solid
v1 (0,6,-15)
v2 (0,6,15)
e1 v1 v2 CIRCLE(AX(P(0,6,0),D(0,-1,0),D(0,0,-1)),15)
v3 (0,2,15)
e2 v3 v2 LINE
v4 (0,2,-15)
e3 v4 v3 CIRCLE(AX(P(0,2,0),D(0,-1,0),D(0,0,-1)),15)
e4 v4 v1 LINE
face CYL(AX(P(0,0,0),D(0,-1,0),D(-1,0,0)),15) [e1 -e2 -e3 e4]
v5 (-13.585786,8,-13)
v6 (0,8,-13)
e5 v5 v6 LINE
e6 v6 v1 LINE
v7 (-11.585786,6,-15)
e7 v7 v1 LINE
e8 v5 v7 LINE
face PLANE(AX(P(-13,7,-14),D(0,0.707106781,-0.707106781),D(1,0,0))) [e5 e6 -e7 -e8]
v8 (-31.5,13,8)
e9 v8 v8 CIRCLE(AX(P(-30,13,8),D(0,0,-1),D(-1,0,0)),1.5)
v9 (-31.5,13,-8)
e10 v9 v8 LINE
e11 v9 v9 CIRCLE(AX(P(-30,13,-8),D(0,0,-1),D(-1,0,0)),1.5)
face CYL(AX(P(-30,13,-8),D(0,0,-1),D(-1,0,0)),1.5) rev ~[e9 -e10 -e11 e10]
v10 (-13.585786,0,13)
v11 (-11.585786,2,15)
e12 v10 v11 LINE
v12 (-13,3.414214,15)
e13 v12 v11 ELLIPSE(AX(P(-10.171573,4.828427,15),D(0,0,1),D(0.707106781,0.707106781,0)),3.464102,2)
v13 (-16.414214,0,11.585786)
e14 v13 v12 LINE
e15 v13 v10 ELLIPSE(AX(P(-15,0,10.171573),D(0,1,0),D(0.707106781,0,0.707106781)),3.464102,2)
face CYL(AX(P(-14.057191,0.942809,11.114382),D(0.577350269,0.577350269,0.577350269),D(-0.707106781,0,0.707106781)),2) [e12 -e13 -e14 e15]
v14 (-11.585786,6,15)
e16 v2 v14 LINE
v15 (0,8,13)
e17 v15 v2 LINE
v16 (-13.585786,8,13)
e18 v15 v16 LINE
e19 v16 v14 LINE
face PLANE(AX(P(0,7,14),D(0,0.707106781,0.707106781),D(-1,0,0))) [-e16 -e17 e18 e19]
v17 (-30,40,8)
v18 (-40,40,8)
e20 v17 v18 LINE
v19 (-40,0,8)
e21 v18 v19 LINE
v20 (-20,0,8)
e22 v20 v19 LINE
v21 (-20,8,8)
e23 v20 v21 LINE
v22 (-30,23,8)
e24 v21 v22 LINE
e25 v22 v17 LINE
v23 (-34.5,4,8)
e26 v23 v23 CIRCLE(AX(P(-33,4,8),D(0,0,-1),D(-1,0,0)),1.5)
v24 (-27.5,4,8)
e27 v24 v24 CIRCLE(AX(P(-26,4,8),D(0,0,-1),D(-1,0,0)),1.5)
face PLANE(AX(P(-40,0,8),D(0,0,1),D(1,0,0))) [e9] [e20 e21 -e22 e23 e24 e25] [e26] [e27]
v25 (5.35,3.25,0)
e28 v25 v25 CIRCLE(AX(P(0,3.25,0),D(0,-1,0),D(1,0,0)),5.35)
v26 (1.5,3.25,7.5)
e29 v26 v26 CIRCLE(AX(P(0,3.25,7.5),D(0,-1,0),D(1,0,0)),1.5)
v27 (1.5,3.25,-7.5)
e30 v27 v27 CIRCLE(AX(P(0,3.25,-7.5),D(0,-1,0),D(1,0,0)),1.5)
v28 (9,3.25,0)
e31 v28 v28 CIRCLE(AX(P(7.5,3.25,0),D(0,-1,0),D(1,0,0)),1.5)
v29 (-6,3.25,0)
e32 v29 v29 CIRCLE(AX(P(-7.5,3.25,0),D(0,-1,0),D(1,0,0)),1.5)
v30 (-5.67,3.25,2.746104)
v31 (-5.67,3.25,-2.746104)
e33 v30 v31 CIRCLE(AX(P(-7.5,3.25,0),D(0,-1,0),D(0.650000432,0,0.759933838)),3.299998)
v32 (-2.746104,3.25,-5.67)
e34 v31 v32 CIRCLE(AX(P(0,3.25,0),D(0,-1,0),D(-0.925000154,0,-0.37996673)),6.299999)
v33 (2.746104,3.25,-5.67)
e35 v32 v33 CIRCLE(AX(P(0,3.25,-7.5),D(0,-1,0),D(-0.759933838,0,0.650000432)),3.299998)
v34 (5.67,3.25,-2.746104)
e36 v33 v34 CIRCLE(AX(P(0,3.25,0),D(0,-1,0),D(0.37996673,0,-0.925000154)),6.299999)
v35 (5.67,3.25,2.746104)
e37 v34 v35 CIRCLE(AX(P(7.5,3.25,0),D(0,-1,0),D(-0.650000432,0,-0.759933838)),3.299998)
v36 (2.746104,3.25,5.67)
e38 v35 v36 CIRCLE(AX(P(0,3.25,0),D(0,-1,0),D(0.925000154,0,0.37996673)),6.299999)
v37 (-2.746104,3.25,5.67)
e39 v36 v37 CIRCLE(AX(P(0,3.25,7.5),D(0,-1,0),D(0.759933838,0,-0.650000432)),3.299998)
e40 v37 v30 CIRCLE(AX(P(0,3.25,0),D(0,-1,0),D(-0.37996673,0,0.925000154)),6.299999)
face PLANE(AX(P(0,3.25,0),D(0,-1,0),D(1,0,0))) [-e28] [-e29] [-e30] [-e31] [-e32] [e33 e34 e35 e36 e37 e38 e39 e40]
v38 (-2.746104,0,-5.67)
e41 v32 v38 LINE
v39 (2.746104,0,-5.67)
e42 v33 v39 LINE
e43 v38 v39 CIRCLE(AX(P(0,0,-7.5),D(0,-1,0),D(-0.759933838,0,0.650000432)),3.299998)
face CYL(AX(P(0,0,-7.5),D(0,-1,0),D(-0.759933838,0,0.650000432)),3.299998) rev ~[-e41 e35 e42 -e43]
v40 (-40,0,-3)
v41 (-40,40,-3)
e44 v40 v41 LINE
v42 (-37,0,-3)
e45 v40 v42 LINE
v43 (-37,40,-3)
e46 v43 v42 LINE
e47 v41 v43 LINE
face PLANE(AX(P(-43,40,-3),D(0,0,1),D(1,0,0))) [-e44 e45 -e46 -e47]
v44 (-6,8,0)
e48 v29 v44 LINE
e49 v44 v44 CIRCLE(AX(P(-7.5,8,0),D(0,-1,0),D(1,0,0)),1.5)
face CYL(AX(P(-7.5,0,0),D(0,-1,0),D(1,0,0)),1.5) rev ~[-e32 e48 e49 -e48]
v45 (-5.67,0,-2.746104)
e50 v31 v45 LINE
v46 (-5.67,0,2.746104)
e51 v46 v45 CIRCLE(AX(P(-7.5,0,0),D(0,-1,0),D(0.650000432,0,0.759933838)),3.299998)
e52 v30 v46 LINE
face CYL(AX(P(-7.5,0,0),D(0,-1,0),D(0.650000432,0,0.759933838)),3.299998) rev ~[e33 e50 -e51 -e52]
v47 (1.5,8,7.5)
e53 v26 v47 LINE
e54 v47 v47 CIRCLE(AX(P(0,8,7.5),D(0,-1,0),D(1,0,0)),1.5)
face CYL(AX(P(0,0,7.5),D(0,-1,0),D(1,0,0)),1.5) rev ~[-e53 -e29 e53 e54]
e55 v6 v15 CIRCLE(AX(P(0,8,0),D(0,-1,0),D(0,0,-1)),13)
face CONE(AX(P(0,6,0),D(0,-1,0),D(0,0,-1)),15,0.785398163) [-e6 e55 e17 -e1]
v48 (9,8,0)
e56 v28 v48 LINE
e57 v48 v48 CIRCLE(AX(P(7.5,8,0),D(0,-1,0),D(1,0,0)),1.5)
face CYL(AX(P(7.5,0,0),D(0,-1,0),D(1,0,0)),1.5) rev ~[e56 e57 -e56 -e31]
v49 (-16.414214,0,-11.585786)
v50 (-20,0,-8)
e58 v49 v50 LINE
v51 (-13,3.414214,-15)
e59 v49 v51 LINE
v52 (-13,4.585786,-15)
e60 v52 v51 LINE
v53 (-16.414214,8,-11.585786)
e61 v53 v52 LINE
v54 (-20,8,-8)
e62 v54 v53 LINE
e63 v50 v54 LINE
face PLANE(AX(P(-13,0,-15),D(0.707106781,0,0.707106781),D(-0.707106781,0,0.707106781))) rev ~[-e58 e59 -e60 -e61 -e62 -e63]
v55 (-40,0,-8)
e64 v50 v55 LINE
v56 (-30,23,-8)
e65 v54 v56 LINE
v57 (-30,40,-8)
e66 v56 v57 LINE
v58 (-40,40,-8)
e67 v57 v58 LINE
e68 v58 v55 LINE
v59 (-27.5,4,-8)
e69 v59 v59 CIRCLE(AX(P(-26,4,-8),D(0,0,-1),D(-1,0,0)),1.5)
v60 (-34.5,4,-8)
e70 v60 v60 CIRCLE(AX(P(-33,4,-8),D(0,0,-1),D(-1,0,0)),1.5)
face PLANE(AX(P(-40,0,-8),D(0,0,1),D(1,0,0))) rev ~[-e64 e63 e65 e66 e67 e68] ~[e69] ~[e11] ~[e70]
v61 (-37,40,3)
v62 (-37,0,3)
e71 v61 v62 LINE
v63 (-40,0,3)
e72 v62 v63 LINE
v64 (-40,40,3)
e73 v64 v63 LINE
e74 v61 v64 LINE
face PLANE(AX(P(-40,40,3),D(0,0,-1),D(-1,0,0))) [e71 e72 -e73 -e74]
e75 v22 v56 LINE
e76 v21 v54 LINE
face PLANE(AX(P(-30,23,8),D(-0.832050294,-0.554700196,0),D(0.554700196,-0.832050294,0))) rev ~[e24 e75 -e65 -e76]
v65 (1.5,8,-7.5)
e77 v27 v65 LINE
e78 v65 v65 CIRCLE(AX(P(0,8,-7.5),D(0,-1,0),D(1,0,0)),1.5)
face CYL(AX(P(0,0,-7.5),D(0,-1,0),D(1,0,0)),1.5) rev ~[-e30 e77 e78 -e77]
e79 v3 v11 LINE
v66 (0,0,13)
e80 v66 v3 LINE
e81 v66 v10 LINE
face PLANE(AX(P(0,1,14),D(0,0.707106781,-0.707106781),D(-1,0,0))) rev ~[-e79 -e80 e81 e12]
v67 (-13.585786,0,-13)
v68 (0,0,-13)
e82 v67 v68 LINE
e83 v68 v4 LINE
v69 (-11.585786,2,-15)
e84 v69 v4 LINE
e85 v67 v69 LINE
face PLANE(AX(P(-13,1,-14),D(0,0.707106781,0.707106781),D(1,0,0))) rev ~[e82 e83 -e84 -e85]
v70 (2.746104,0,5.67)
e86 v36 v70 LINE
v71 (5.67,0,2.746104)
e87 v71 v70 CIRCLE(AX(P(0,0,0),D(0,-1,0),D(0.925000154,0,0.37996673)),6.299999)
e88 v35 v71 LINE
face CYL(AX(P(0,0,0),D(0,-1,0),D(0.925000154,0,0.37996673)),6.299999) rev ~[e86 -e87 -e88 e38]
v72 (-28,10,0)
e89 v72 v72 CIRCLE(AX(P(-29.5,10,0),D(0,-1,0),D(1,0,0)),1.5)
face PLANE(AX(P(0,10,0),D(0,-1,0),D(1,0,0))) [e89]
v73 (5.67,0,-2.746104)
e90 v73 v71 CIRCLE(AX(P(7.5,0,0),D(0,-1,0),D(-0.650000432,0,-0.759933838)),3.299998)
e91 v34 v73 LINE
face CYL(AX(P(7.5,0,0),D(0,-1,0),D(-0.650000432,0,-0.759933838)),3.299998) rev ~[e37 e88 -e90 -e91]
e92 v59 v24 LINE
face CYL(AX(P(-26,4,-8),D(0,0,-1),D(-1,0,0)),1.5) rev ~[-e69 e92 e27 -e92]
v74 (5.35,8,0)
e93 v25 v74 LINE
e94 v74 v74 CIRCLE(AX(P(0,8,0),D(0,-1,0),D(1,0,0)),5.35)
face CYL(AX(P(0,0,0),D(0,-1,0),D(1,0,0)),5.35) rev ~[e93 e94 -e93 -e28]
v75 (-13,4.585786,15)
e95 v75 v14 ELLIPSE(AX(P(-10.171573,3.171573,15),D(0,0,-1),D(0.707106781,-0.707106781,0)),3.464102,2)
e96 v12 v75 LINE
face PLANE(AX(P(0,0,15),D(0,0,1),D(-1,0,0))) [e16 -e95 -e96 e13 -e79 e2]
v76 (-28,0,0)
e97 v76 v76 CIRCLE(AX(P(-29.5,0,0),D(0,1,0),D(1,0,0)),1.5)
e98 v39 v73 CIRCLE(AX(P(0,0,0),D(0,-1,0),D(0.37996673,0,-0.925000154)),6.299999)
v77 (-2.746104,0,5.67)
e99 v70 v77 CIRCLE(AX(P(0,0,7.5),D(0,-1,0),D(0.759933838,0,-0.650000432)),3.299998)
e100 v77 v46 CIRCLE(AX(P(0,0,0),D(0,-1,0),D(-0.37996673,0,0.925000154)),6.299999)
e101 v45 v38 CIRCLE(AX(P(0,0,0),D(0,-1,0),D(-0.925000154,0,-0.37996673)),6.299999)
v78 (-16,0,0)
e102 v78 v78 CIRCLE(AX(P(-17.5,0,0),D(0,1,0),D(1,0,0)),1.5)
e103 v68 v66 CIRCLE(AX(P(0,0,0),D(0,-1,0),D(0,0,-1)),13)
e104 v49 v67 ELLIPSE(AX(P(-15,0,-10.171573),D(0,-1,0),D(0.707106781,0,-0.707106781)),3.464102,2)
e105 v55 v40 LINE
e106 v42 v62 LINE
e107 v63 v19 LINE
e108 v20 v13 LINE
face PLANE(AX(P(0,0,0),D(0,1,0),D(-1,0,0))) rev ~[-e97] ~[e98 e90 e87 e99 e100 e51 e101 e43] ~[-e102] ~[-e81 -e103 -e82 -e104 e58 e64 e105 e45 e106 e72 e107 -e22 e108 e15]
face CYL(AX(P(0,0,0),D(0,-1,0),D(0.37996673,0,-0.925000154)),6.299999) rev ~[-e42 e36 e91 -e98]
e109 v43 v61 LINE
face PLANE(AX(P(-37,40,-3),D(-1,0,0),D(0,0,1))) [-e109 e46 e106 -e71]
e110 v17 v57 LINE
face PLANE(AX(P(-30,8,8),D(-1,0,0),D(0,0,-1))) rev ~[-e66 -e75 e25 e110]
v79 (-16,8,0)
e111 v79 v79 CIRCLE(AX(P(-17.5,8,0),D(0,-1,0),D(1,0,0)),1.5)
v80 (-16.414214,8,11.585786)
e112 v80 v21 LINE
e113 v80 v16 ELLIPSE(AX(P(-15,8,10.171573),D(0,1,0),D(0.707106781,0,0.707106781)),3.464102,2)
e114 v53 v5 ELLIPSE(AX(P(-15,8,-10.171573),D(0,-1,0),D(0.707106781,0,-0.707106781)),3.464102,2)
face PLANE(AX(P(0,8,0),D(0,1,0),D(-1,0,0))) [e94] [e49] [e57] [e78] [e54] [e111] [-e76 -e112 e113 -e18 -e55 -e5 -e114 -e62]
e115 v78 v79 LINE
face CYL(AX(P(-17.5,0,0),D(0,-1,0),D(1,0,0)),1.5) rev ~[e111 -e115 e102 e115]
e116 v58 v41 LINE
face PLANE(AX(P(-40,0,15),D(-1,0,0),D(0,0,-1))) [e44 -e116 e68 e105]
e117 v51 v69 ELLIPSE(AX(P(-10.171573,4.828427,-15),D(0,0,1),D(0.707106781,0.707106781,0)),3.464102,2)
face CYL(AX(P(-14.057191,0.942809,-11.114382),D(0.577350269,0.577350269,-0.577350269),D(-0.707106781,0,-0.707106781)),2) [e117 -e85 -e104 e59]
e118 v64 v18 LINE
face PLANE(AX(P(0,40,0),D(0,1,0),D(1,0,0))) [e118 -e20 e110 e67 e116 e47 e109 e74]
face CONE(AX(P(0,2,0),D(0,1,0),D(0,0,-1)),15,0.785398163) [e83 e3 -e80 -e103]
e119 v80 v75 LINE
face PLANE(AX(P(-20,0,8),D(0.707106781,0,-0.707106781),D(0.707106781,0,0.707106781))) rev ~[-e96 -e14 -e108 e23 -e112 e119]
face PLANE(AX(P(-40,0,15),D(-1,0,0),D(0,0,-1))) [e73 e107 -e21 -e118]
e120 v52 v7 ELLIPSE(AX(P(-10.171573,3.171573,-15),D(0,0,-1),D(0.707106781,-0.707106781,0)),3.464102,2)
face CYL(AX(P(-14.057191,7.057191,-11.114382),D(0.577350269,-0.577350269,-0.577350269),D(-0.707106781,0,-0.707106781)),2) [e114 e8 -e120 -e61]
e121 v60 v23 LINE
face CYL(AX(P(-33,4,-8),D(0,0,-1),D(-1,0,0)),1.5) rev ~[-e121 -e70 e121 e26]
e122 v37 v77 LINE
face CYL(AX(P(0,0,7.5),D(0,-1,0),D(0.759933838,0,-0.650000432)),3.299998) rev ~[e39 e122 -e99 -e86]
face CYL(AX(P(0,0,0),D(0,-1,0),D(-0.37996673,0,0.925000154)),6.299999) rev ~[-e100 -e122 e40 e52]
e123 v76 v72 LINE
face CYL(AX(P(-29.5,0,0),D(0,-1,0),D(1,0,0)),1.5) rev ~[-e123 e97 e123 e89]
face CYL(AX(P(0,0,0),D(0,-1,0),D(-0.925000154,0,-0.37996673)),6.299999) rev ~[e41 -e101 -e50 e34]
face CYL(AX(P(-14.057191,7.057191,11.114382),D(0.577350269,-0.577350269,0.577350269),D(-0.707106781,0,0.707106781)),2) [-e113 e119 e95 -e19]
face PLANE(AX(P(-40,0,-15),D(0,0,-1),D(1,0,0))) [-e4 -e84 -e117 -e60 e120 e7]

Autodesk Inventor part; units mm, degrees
ref_plane "YZ Plane" through (0, 0, 0) normal (1, 0, 0) x (0, 1, 0)
ref_plane "XZ Plane" through (0, 0, 0) normal (0, 1, 0) x (-1, 0, 0)
sketch "Sketch1" plane through (0, 0, 0) normal (0, 1, 0) x (-1, 0, 0)
  circle A0 centre (0, 0) radius 15
  line L0 (0, 0) -> (0, 15)
  line L1 (0, 15) -> (40, 15)
  line L2 (40, 15) -> (40, -15)
  line L3 (40, -15) -> (0, -15)
  line L4 (0, -15) -> (0, 15)
  dimension "d0" = 30
  dimension "d1" = 15
  dimension "d2" = 40
  dimension "d3" = 30
extrude "Extrusion1" add sketch "Sketch1" along normal blind 8
sketch "Sketch2" plane through (-40, 0, -15) normal (-1, 0, 0) x (0, 0, 1)
  line L0 (0, 0) -> (30, 0) projected
  line L1 (30, 0) -> (30, 8) projected
  line L2 (0, 8) -> (30, 8) projected
  line L3 (0, 0) -> (0, 8) projected
  line L4 (0, 0) -> (30, 0) projected
  line L5 (0, 0) -> (30, 0)
  line L6 (30, 0) -> (30, 40)
  line L7 (30, 40) -> (0, 40)
  line L8 (0, 40) -> (0, 0)
  point P0 (15, 0)
  dimension "d6" = 30
  dimension "d7" = 40
extrude "Extrusion2" add sketch "Sketch2" against normal blind 5
sketch "Sketch3" plane through (-40, 40, 15) normal (0, 1, 0) x (1, 0, 0)
  line L0 (0, 0) -> (0, 30) projected
  line L1 (0, 0) -> (5, 0) projected
  line L2 (5, 30) -> (5, 0) projected
  line L3 (0, 30) -> (5, 30) projected
  line L4 (3, 18) -> (3, 12)
  line L5 (3, 12) -> (-3, 12)
  line L6 (-3, 12) -> (-3, 18)
  line L7 (-3, 18) -> (3, 18)
  line L8 (0, 30) -> (0, 0) projected
  line L9 (3, 18) -> (-3, 12) construction
  line L10 (3, 12) -> (-3, 18) construction
  point P0 (40, 15)
  point P1 (0, 15)
  dimension "d10" = 6
  dimension "d11" = 6
extrude "Extrusion3" cut sketch "Sketch3" against normal up to surface (40 mm away) contours L5 L6 L7 L0 | L0 L7 L4 L5
sketch "Sketch4" plane through (0, 0, 0) normal (0, -1, 0) x (1, 0, 0)
  circle A0 centre (0, 0) radius 5.35
  dimension "d14" = 10.7
extrude "Extrusion4" cut sketch "Sketch4" against normal blind 8
sketch "Sketch5" plane through (0, 0, 0) normal (0, -1, 0) x (1, 0, 0)
  circle A0 centre (0, 0) radius 5.35 projected
  line L0 (-37, -3) -> (-40, -3) projected
  line L1 (-40, -15) -> (-40, -3) projected
  line L2 (0, -15) -> (-40, -15) projected
  arc A1 (0, -15) -> (0, 15) centre (0, 0) ccw projected
  line L3 (-40, 15) -> (0, 15) projected
  line L4 (-40, 3) -> (-40, 15) projected
  line L5 (-40, 3) -> (-37, 3) projected
  line L6 (-37, 3) -> (-37, -3) projected
  line L7 (-40, -15) -> (-20, -15)
  line L8 (-20, -15) -> (-20, -8)
  line L9 (-20, -8) -> (-40, -8)
  line L10 (-40, -8) -> (-40, -15)
  line L11 (-40, 15) -> (0, 15) projected
  line L12 (-40, 15) -> (-20, 15)
  line L13 (-20, 15) -> (-20, 8)
  line L14 (-20, 8) -> (-40, 8)
  line L15 (-40, 8) -> (-40, 15)
  line L16 (-20, -8) -> (-13, -8)
  line L17 (-13, -8) -> (-13, -15)
  line L18 (-13, -15) -> (-20, -15)
  line L19 (-20, -15) -> (-20, -8)
  line L20 (-20, 8) -> (-13, 8)
  line L21 (-13, 8) -> (-13, 15)
  line L22 (-13, 15) -> (-20, 15)
  line L23 (-20, 15) -> (-20, 8)
  line L24 (-13, -15) -> (-20, -8)
  line L25 (-20, 8) -> (-13, 15)
  dimension "d17" = 20
  dimension "d18" = 7
  dimension "d19" = 20
  dimension "d20" = 7
  dimension "d21" = 7
  dimension "d22" = 7
  dimension "d23" = 7
  dimension "d24" = 7
extrude "Extrusion5" cut sketch "Sketch5" against normal up to surface (40 mm away) contours L9 L8 L2 L1 | L24 L2 L8 | L4 L3 L13 L14 | L13 L3 L25
sketch "Sketch6" plane through (0, 8, 0) normal (0, 1, 0) x (1, 0, 0)
  line L0 (-20, -8) -> (-13, -15) projected
  line L1 (-13, -15) -> (0, -15) projected
  arc A0 (0, -15) -> (0, 15) centre (0, 0) ccw projected
  line L2 (0, 15) -> (-13, 15) projected
  line L3 (-13, 15) -> (-20, 8) projected
  line L4 (-20, 8) -> (-35, 8) projected
  line L5 (-35, 8) -> (-35, -8) projected
  line L6 (-35, -8) -> (-20, -8) projected
  circle A1 centre (0, 0) radius 5.35 projected
  line L7 (-35, 8) -> (-35, -8) projected
  line L8 (-35, -8) -> (-30, -8)
  line L9 (-30, -8) -> (-30, 8)
  line L10 (-30, 8) -> (-35, 8)
  line L11 (-35, 8) -> (-35, -8)
  dimension "d27" = 5
  dimension "d28" = 16
extrude "Extrusion6" add sketch "Sketch6" along normal up to surface (32 mm away) contours L6 L5 L4 L9
sketch "Sketch8" plane through (-40, 0, 8) normal (0, 0, 1) x (1, 0, 0)
  line L0 (10, 8) -> (10, 40) projected
  line L1 (0, 40) -> (10, 40) projected
  line L2 (0, 0) -> (0, 40) projected
  line L3 (20, 0) -> (0, 0) projected
  line L4 (20, 0) -> (20, 8) projected
  line L5 (10, 8) -> (20, 8) projected
  line L6 (10, 8) -> (10, 40) projected
  line L7 (10, 8) -> (10, 23)
  line L8 (10, 23) -> (20, 8)
  point P0 (40, 0)
  dimension "d34" = 15
extrude "Extrusion8" add sketch "Sketch8" against normal up to surface (16 mm away) contours L0 L8 L5
sketch "Sketch9" plane through (-20, 0, -8) normal (0, 0, -1) x (-1, 0, 0)
  line L0 (0, 0) -> (0, 8) projected
  line L1 (20, 0) -> (0, 0) projected
  line L2 (20, 40) -> (20, 0) projected
  line L3 (10, 40) -> (20, 40) projected
  line L4 (10, 23) -> (10, 40) projected
  line L5 (10, 23) -> (0, 8) projected
  line L6 (20, 0) -> (0, 0) projected
  line L7 (0, 0) -> (0, 4)
  line L8 (0, 0) -> (0, 8) projected
  line L9 (0, 4) -> (6, 4)
  line L10 (6, 4) -> (13, 4)
  circle A0 centre (6, 4) radius 1.5
  circle A1 centre (13, 4) radius 1.5
  line L11 (13, 4) -> (13, 13)
  line L12 (13, 13) -> (10, 13)
  circle A2 centre (10, 13) radius 1.5
  point P0 (-20, 0)
  dimension "d37" = 4
  dimension "d38" = 6
  dimension "d39" = 7
  dimension "d40" = 3
  dimension "d41" = 3
  dimension "d42" = 9
  dimension "d43" = 3
  dimension "d44" = 3
extrude "Extrusion9" cut sketch "Sketch9" against normal up to surface (16 mm away) contours A0 L10 L9 | L9 L10 A0 | A1 L11 L10 | L10 L11 A1 | A2
sketch "Sketch10" plane through (0, 0, 0) normal (0, -1, 0) x (1, 0, 0)
  point P0 (0, 0)
sketch "Sketch11" plane through (0, 0, 0) normal (0, -1, 0) x (1, 0, 0)
  circle A0 centre (0, 0) radius 5.35 projected
  line L0 (-13, 15) -> (-20, 8) projected
  line L1 (-20, 8) -> (-40, 8) projected
  line L2 (-40, 3) -> (-40, 8) projected
  line L3 (-40, 3) -> (-37, 3) projected
  line L4 (-37, 3) -> (-37, -3) projected
  line L5 (-37, -3) -> (-40, -3) projected
  line L6 (-40, -8) -> (-40, -3) projected
  line L7 (-40, -8) -> (-20, -8) projected
  line L8 (-20, -8) -> (-13, -15) projected
  line L9 (0, -15) -> (-13, -15) projected
  arc A1 (0, -15) -> (0, 15) centre (0, 0) ccw projected
  line L10 (-13, 15) -> (0, 15) projected
  line L11 (0, 0) -> (7.5, 0)
  circle A2 centre (7.5, 0) radius 1.5
  circle A3 centre (0, 7.5) radius 1.5
  circle A4 centre (-7.5, 0) radius 1.5
  circle A5 centre (0, -7.5) radius 1.5
  dimension "d47" = 7.5
  dimension "d48" = 3
  dimension "d51" = 360
extrude "Extrusion10" cut sketch "Sketch11" against normal blind 10 contours A2 | A3 | A4 | A5
sketch "Sketch12" plane through (0, 0, 0) normal (0, -1, 0) x (1, 0, 0)
  point P0 (0, 0)
sketch "Sketch13" plane through (0, 0, 0) normal (0, -1, 0) x (1, 0, 0)
  arc A0 (-2.2798, -5.55) -> (2.2798, -5.55) centre (0, -7.5) ccw projected
  arc A1 (-5.55, -2.2798) -> (-2.2798, -5.55) centre (0, 0) ccw projected
  arc A2 (-5.55, 2.2798) -> (-5.55, -2.2798) centre (-7.5, 0) ccw projected
  arc A3 (-2.2798, 5.55) -> (-5.55, 2.2798) centre (0, 0) ccw projected
  arc A4 (2.2798, 5.55) -> (-2.2798, 5.55) centre (0, 7.5) ccw projected
  arc A5 (5.55, 2.2798) -> (2.2798, 5.55) centre (0, 0) ccw projected
  arc A6 (5.55, -2.2798) -> (5.55, 2.2798) centre (7.5, 0) ccw projected
  arc A7 (2.2798, -5.55) -> (5.55, -2.2798) centre (0, 0) ccw projected
  point P0 (0, 0)
ref_plane "Work Plane1" through (-10.5, 3.25, -10.5) normal (0, 1, 0) x (0, 0, 1)
extrude "Extrusion11" cut sketch "Sketch13" against normal up to surface (3.25 mm away)
thicken "Thicken1" operation add thickness 0.3 both sides no extend neighbours yes toward (0.8094149, 0, 0.5872372) faces at (2.4282, 2.1667, -5.7383) (-4.513, 2.1667, -3.9539) (-7.296, 2.1667, -2.9931) (-4.7637, 2.1667, 3.6479) (-2.4282, 2.1667, 5.7383) (5.3877, 1.0833, 2.6405) (7.296, 2.1667, 2.9931) (4.7637, 2.1667, -3.6479)
sketch "Sketch14" plane through (0, 0, 0) normal (0, -1, 0) x (1, 0, 0)
  arc A0 (5.67, -2.7461) -> (5.67, 2.7461) centre (7.5, 0) ccw projected
  arc A1 (2.7461, -5.67) -> (5.67, -2.7461) centre (0, 0) ccw projected
  arc A2 (-2.7461, -5.67) -> (2.7461, -5.67) centre (0, -7.5) ccw projected
  arc A3 (-5.67, -2.7461) -> (-2.7461, -5.67) centre (0, 0) ccw projected
  arc A4 (-5.67, 2.7461) -> (-5.67, -2.7461) centre (-7.5, 0) ccw projected
  arc A5 (-2.7461, 5.67) -> (-5.67, 2.7461) centre (0, 0) ccw projected
  arc A6 (2.7461, 5.67) -> (-2.7461, 5.67) centre (0, 7.5) ccw projected
  arc A7 (5.67, 2.7461) -> (2.7461, 5.67) centre (0, 0) ccw projected
  line L0 (-13, 15) -> (-20, 8) projected
  line L1 (-20, 8) -> (-40, 8) projected
  line L2 (-40, 3) -> (-40, 8) projected
  line L3 (-40, 3) -> (-37, 3) projected
  line L4 (-37, 3) -> (-37, -3) projected
  line L5 (-37, -3) -> (-40, -3) projected
  line L6 (-40, -8) -> (-40, -3) projected
  line L7 (-40, -8) -> (-20, -8) projected
  line L8 (-20, -8) -> (-13, -15) projected
  line L9 (0, -15) -> (-13, -15) projected
  arc A8 (0, -15) -> (0, 15) centre (0, 0) ccw projected
  line L10 (-13, 15) -> (0, 15) projected
  line L11 (-37, 0) -> (-29.5, 0)
  circle A9 centre (-29.5, 0) radius 1.5
  line L12 (-29.5, 0) -> (-17.5, 0)
  circle A10 centre (-17.5, 0) radius 1.5
  dimension "d59" = 7.5
  dimension "d60" = 3
  dimension "d61" = 12
  dimension "d62" = 3
extrude "Extrusion12" cut sketch "Sketch14" against normal blind 10 contours A9 L12 L11 | L11 L12 A9 | A10
chamfer "Chamfer1" distance 2 angle 45 6 edges at (-6.5, 0, -15) (15, 0, 0) (-6.5, 0, 15) (15, 8, 0) (-6.5, 8, -15) (-6.5, 8, 15)
fillet "Fillet1" radius 2 4 edges at (-14, 1, -14) (-14, 7, -14) (-14, 1, 14) (-14, 7, 14)
properties part number "dog_bone_3"
